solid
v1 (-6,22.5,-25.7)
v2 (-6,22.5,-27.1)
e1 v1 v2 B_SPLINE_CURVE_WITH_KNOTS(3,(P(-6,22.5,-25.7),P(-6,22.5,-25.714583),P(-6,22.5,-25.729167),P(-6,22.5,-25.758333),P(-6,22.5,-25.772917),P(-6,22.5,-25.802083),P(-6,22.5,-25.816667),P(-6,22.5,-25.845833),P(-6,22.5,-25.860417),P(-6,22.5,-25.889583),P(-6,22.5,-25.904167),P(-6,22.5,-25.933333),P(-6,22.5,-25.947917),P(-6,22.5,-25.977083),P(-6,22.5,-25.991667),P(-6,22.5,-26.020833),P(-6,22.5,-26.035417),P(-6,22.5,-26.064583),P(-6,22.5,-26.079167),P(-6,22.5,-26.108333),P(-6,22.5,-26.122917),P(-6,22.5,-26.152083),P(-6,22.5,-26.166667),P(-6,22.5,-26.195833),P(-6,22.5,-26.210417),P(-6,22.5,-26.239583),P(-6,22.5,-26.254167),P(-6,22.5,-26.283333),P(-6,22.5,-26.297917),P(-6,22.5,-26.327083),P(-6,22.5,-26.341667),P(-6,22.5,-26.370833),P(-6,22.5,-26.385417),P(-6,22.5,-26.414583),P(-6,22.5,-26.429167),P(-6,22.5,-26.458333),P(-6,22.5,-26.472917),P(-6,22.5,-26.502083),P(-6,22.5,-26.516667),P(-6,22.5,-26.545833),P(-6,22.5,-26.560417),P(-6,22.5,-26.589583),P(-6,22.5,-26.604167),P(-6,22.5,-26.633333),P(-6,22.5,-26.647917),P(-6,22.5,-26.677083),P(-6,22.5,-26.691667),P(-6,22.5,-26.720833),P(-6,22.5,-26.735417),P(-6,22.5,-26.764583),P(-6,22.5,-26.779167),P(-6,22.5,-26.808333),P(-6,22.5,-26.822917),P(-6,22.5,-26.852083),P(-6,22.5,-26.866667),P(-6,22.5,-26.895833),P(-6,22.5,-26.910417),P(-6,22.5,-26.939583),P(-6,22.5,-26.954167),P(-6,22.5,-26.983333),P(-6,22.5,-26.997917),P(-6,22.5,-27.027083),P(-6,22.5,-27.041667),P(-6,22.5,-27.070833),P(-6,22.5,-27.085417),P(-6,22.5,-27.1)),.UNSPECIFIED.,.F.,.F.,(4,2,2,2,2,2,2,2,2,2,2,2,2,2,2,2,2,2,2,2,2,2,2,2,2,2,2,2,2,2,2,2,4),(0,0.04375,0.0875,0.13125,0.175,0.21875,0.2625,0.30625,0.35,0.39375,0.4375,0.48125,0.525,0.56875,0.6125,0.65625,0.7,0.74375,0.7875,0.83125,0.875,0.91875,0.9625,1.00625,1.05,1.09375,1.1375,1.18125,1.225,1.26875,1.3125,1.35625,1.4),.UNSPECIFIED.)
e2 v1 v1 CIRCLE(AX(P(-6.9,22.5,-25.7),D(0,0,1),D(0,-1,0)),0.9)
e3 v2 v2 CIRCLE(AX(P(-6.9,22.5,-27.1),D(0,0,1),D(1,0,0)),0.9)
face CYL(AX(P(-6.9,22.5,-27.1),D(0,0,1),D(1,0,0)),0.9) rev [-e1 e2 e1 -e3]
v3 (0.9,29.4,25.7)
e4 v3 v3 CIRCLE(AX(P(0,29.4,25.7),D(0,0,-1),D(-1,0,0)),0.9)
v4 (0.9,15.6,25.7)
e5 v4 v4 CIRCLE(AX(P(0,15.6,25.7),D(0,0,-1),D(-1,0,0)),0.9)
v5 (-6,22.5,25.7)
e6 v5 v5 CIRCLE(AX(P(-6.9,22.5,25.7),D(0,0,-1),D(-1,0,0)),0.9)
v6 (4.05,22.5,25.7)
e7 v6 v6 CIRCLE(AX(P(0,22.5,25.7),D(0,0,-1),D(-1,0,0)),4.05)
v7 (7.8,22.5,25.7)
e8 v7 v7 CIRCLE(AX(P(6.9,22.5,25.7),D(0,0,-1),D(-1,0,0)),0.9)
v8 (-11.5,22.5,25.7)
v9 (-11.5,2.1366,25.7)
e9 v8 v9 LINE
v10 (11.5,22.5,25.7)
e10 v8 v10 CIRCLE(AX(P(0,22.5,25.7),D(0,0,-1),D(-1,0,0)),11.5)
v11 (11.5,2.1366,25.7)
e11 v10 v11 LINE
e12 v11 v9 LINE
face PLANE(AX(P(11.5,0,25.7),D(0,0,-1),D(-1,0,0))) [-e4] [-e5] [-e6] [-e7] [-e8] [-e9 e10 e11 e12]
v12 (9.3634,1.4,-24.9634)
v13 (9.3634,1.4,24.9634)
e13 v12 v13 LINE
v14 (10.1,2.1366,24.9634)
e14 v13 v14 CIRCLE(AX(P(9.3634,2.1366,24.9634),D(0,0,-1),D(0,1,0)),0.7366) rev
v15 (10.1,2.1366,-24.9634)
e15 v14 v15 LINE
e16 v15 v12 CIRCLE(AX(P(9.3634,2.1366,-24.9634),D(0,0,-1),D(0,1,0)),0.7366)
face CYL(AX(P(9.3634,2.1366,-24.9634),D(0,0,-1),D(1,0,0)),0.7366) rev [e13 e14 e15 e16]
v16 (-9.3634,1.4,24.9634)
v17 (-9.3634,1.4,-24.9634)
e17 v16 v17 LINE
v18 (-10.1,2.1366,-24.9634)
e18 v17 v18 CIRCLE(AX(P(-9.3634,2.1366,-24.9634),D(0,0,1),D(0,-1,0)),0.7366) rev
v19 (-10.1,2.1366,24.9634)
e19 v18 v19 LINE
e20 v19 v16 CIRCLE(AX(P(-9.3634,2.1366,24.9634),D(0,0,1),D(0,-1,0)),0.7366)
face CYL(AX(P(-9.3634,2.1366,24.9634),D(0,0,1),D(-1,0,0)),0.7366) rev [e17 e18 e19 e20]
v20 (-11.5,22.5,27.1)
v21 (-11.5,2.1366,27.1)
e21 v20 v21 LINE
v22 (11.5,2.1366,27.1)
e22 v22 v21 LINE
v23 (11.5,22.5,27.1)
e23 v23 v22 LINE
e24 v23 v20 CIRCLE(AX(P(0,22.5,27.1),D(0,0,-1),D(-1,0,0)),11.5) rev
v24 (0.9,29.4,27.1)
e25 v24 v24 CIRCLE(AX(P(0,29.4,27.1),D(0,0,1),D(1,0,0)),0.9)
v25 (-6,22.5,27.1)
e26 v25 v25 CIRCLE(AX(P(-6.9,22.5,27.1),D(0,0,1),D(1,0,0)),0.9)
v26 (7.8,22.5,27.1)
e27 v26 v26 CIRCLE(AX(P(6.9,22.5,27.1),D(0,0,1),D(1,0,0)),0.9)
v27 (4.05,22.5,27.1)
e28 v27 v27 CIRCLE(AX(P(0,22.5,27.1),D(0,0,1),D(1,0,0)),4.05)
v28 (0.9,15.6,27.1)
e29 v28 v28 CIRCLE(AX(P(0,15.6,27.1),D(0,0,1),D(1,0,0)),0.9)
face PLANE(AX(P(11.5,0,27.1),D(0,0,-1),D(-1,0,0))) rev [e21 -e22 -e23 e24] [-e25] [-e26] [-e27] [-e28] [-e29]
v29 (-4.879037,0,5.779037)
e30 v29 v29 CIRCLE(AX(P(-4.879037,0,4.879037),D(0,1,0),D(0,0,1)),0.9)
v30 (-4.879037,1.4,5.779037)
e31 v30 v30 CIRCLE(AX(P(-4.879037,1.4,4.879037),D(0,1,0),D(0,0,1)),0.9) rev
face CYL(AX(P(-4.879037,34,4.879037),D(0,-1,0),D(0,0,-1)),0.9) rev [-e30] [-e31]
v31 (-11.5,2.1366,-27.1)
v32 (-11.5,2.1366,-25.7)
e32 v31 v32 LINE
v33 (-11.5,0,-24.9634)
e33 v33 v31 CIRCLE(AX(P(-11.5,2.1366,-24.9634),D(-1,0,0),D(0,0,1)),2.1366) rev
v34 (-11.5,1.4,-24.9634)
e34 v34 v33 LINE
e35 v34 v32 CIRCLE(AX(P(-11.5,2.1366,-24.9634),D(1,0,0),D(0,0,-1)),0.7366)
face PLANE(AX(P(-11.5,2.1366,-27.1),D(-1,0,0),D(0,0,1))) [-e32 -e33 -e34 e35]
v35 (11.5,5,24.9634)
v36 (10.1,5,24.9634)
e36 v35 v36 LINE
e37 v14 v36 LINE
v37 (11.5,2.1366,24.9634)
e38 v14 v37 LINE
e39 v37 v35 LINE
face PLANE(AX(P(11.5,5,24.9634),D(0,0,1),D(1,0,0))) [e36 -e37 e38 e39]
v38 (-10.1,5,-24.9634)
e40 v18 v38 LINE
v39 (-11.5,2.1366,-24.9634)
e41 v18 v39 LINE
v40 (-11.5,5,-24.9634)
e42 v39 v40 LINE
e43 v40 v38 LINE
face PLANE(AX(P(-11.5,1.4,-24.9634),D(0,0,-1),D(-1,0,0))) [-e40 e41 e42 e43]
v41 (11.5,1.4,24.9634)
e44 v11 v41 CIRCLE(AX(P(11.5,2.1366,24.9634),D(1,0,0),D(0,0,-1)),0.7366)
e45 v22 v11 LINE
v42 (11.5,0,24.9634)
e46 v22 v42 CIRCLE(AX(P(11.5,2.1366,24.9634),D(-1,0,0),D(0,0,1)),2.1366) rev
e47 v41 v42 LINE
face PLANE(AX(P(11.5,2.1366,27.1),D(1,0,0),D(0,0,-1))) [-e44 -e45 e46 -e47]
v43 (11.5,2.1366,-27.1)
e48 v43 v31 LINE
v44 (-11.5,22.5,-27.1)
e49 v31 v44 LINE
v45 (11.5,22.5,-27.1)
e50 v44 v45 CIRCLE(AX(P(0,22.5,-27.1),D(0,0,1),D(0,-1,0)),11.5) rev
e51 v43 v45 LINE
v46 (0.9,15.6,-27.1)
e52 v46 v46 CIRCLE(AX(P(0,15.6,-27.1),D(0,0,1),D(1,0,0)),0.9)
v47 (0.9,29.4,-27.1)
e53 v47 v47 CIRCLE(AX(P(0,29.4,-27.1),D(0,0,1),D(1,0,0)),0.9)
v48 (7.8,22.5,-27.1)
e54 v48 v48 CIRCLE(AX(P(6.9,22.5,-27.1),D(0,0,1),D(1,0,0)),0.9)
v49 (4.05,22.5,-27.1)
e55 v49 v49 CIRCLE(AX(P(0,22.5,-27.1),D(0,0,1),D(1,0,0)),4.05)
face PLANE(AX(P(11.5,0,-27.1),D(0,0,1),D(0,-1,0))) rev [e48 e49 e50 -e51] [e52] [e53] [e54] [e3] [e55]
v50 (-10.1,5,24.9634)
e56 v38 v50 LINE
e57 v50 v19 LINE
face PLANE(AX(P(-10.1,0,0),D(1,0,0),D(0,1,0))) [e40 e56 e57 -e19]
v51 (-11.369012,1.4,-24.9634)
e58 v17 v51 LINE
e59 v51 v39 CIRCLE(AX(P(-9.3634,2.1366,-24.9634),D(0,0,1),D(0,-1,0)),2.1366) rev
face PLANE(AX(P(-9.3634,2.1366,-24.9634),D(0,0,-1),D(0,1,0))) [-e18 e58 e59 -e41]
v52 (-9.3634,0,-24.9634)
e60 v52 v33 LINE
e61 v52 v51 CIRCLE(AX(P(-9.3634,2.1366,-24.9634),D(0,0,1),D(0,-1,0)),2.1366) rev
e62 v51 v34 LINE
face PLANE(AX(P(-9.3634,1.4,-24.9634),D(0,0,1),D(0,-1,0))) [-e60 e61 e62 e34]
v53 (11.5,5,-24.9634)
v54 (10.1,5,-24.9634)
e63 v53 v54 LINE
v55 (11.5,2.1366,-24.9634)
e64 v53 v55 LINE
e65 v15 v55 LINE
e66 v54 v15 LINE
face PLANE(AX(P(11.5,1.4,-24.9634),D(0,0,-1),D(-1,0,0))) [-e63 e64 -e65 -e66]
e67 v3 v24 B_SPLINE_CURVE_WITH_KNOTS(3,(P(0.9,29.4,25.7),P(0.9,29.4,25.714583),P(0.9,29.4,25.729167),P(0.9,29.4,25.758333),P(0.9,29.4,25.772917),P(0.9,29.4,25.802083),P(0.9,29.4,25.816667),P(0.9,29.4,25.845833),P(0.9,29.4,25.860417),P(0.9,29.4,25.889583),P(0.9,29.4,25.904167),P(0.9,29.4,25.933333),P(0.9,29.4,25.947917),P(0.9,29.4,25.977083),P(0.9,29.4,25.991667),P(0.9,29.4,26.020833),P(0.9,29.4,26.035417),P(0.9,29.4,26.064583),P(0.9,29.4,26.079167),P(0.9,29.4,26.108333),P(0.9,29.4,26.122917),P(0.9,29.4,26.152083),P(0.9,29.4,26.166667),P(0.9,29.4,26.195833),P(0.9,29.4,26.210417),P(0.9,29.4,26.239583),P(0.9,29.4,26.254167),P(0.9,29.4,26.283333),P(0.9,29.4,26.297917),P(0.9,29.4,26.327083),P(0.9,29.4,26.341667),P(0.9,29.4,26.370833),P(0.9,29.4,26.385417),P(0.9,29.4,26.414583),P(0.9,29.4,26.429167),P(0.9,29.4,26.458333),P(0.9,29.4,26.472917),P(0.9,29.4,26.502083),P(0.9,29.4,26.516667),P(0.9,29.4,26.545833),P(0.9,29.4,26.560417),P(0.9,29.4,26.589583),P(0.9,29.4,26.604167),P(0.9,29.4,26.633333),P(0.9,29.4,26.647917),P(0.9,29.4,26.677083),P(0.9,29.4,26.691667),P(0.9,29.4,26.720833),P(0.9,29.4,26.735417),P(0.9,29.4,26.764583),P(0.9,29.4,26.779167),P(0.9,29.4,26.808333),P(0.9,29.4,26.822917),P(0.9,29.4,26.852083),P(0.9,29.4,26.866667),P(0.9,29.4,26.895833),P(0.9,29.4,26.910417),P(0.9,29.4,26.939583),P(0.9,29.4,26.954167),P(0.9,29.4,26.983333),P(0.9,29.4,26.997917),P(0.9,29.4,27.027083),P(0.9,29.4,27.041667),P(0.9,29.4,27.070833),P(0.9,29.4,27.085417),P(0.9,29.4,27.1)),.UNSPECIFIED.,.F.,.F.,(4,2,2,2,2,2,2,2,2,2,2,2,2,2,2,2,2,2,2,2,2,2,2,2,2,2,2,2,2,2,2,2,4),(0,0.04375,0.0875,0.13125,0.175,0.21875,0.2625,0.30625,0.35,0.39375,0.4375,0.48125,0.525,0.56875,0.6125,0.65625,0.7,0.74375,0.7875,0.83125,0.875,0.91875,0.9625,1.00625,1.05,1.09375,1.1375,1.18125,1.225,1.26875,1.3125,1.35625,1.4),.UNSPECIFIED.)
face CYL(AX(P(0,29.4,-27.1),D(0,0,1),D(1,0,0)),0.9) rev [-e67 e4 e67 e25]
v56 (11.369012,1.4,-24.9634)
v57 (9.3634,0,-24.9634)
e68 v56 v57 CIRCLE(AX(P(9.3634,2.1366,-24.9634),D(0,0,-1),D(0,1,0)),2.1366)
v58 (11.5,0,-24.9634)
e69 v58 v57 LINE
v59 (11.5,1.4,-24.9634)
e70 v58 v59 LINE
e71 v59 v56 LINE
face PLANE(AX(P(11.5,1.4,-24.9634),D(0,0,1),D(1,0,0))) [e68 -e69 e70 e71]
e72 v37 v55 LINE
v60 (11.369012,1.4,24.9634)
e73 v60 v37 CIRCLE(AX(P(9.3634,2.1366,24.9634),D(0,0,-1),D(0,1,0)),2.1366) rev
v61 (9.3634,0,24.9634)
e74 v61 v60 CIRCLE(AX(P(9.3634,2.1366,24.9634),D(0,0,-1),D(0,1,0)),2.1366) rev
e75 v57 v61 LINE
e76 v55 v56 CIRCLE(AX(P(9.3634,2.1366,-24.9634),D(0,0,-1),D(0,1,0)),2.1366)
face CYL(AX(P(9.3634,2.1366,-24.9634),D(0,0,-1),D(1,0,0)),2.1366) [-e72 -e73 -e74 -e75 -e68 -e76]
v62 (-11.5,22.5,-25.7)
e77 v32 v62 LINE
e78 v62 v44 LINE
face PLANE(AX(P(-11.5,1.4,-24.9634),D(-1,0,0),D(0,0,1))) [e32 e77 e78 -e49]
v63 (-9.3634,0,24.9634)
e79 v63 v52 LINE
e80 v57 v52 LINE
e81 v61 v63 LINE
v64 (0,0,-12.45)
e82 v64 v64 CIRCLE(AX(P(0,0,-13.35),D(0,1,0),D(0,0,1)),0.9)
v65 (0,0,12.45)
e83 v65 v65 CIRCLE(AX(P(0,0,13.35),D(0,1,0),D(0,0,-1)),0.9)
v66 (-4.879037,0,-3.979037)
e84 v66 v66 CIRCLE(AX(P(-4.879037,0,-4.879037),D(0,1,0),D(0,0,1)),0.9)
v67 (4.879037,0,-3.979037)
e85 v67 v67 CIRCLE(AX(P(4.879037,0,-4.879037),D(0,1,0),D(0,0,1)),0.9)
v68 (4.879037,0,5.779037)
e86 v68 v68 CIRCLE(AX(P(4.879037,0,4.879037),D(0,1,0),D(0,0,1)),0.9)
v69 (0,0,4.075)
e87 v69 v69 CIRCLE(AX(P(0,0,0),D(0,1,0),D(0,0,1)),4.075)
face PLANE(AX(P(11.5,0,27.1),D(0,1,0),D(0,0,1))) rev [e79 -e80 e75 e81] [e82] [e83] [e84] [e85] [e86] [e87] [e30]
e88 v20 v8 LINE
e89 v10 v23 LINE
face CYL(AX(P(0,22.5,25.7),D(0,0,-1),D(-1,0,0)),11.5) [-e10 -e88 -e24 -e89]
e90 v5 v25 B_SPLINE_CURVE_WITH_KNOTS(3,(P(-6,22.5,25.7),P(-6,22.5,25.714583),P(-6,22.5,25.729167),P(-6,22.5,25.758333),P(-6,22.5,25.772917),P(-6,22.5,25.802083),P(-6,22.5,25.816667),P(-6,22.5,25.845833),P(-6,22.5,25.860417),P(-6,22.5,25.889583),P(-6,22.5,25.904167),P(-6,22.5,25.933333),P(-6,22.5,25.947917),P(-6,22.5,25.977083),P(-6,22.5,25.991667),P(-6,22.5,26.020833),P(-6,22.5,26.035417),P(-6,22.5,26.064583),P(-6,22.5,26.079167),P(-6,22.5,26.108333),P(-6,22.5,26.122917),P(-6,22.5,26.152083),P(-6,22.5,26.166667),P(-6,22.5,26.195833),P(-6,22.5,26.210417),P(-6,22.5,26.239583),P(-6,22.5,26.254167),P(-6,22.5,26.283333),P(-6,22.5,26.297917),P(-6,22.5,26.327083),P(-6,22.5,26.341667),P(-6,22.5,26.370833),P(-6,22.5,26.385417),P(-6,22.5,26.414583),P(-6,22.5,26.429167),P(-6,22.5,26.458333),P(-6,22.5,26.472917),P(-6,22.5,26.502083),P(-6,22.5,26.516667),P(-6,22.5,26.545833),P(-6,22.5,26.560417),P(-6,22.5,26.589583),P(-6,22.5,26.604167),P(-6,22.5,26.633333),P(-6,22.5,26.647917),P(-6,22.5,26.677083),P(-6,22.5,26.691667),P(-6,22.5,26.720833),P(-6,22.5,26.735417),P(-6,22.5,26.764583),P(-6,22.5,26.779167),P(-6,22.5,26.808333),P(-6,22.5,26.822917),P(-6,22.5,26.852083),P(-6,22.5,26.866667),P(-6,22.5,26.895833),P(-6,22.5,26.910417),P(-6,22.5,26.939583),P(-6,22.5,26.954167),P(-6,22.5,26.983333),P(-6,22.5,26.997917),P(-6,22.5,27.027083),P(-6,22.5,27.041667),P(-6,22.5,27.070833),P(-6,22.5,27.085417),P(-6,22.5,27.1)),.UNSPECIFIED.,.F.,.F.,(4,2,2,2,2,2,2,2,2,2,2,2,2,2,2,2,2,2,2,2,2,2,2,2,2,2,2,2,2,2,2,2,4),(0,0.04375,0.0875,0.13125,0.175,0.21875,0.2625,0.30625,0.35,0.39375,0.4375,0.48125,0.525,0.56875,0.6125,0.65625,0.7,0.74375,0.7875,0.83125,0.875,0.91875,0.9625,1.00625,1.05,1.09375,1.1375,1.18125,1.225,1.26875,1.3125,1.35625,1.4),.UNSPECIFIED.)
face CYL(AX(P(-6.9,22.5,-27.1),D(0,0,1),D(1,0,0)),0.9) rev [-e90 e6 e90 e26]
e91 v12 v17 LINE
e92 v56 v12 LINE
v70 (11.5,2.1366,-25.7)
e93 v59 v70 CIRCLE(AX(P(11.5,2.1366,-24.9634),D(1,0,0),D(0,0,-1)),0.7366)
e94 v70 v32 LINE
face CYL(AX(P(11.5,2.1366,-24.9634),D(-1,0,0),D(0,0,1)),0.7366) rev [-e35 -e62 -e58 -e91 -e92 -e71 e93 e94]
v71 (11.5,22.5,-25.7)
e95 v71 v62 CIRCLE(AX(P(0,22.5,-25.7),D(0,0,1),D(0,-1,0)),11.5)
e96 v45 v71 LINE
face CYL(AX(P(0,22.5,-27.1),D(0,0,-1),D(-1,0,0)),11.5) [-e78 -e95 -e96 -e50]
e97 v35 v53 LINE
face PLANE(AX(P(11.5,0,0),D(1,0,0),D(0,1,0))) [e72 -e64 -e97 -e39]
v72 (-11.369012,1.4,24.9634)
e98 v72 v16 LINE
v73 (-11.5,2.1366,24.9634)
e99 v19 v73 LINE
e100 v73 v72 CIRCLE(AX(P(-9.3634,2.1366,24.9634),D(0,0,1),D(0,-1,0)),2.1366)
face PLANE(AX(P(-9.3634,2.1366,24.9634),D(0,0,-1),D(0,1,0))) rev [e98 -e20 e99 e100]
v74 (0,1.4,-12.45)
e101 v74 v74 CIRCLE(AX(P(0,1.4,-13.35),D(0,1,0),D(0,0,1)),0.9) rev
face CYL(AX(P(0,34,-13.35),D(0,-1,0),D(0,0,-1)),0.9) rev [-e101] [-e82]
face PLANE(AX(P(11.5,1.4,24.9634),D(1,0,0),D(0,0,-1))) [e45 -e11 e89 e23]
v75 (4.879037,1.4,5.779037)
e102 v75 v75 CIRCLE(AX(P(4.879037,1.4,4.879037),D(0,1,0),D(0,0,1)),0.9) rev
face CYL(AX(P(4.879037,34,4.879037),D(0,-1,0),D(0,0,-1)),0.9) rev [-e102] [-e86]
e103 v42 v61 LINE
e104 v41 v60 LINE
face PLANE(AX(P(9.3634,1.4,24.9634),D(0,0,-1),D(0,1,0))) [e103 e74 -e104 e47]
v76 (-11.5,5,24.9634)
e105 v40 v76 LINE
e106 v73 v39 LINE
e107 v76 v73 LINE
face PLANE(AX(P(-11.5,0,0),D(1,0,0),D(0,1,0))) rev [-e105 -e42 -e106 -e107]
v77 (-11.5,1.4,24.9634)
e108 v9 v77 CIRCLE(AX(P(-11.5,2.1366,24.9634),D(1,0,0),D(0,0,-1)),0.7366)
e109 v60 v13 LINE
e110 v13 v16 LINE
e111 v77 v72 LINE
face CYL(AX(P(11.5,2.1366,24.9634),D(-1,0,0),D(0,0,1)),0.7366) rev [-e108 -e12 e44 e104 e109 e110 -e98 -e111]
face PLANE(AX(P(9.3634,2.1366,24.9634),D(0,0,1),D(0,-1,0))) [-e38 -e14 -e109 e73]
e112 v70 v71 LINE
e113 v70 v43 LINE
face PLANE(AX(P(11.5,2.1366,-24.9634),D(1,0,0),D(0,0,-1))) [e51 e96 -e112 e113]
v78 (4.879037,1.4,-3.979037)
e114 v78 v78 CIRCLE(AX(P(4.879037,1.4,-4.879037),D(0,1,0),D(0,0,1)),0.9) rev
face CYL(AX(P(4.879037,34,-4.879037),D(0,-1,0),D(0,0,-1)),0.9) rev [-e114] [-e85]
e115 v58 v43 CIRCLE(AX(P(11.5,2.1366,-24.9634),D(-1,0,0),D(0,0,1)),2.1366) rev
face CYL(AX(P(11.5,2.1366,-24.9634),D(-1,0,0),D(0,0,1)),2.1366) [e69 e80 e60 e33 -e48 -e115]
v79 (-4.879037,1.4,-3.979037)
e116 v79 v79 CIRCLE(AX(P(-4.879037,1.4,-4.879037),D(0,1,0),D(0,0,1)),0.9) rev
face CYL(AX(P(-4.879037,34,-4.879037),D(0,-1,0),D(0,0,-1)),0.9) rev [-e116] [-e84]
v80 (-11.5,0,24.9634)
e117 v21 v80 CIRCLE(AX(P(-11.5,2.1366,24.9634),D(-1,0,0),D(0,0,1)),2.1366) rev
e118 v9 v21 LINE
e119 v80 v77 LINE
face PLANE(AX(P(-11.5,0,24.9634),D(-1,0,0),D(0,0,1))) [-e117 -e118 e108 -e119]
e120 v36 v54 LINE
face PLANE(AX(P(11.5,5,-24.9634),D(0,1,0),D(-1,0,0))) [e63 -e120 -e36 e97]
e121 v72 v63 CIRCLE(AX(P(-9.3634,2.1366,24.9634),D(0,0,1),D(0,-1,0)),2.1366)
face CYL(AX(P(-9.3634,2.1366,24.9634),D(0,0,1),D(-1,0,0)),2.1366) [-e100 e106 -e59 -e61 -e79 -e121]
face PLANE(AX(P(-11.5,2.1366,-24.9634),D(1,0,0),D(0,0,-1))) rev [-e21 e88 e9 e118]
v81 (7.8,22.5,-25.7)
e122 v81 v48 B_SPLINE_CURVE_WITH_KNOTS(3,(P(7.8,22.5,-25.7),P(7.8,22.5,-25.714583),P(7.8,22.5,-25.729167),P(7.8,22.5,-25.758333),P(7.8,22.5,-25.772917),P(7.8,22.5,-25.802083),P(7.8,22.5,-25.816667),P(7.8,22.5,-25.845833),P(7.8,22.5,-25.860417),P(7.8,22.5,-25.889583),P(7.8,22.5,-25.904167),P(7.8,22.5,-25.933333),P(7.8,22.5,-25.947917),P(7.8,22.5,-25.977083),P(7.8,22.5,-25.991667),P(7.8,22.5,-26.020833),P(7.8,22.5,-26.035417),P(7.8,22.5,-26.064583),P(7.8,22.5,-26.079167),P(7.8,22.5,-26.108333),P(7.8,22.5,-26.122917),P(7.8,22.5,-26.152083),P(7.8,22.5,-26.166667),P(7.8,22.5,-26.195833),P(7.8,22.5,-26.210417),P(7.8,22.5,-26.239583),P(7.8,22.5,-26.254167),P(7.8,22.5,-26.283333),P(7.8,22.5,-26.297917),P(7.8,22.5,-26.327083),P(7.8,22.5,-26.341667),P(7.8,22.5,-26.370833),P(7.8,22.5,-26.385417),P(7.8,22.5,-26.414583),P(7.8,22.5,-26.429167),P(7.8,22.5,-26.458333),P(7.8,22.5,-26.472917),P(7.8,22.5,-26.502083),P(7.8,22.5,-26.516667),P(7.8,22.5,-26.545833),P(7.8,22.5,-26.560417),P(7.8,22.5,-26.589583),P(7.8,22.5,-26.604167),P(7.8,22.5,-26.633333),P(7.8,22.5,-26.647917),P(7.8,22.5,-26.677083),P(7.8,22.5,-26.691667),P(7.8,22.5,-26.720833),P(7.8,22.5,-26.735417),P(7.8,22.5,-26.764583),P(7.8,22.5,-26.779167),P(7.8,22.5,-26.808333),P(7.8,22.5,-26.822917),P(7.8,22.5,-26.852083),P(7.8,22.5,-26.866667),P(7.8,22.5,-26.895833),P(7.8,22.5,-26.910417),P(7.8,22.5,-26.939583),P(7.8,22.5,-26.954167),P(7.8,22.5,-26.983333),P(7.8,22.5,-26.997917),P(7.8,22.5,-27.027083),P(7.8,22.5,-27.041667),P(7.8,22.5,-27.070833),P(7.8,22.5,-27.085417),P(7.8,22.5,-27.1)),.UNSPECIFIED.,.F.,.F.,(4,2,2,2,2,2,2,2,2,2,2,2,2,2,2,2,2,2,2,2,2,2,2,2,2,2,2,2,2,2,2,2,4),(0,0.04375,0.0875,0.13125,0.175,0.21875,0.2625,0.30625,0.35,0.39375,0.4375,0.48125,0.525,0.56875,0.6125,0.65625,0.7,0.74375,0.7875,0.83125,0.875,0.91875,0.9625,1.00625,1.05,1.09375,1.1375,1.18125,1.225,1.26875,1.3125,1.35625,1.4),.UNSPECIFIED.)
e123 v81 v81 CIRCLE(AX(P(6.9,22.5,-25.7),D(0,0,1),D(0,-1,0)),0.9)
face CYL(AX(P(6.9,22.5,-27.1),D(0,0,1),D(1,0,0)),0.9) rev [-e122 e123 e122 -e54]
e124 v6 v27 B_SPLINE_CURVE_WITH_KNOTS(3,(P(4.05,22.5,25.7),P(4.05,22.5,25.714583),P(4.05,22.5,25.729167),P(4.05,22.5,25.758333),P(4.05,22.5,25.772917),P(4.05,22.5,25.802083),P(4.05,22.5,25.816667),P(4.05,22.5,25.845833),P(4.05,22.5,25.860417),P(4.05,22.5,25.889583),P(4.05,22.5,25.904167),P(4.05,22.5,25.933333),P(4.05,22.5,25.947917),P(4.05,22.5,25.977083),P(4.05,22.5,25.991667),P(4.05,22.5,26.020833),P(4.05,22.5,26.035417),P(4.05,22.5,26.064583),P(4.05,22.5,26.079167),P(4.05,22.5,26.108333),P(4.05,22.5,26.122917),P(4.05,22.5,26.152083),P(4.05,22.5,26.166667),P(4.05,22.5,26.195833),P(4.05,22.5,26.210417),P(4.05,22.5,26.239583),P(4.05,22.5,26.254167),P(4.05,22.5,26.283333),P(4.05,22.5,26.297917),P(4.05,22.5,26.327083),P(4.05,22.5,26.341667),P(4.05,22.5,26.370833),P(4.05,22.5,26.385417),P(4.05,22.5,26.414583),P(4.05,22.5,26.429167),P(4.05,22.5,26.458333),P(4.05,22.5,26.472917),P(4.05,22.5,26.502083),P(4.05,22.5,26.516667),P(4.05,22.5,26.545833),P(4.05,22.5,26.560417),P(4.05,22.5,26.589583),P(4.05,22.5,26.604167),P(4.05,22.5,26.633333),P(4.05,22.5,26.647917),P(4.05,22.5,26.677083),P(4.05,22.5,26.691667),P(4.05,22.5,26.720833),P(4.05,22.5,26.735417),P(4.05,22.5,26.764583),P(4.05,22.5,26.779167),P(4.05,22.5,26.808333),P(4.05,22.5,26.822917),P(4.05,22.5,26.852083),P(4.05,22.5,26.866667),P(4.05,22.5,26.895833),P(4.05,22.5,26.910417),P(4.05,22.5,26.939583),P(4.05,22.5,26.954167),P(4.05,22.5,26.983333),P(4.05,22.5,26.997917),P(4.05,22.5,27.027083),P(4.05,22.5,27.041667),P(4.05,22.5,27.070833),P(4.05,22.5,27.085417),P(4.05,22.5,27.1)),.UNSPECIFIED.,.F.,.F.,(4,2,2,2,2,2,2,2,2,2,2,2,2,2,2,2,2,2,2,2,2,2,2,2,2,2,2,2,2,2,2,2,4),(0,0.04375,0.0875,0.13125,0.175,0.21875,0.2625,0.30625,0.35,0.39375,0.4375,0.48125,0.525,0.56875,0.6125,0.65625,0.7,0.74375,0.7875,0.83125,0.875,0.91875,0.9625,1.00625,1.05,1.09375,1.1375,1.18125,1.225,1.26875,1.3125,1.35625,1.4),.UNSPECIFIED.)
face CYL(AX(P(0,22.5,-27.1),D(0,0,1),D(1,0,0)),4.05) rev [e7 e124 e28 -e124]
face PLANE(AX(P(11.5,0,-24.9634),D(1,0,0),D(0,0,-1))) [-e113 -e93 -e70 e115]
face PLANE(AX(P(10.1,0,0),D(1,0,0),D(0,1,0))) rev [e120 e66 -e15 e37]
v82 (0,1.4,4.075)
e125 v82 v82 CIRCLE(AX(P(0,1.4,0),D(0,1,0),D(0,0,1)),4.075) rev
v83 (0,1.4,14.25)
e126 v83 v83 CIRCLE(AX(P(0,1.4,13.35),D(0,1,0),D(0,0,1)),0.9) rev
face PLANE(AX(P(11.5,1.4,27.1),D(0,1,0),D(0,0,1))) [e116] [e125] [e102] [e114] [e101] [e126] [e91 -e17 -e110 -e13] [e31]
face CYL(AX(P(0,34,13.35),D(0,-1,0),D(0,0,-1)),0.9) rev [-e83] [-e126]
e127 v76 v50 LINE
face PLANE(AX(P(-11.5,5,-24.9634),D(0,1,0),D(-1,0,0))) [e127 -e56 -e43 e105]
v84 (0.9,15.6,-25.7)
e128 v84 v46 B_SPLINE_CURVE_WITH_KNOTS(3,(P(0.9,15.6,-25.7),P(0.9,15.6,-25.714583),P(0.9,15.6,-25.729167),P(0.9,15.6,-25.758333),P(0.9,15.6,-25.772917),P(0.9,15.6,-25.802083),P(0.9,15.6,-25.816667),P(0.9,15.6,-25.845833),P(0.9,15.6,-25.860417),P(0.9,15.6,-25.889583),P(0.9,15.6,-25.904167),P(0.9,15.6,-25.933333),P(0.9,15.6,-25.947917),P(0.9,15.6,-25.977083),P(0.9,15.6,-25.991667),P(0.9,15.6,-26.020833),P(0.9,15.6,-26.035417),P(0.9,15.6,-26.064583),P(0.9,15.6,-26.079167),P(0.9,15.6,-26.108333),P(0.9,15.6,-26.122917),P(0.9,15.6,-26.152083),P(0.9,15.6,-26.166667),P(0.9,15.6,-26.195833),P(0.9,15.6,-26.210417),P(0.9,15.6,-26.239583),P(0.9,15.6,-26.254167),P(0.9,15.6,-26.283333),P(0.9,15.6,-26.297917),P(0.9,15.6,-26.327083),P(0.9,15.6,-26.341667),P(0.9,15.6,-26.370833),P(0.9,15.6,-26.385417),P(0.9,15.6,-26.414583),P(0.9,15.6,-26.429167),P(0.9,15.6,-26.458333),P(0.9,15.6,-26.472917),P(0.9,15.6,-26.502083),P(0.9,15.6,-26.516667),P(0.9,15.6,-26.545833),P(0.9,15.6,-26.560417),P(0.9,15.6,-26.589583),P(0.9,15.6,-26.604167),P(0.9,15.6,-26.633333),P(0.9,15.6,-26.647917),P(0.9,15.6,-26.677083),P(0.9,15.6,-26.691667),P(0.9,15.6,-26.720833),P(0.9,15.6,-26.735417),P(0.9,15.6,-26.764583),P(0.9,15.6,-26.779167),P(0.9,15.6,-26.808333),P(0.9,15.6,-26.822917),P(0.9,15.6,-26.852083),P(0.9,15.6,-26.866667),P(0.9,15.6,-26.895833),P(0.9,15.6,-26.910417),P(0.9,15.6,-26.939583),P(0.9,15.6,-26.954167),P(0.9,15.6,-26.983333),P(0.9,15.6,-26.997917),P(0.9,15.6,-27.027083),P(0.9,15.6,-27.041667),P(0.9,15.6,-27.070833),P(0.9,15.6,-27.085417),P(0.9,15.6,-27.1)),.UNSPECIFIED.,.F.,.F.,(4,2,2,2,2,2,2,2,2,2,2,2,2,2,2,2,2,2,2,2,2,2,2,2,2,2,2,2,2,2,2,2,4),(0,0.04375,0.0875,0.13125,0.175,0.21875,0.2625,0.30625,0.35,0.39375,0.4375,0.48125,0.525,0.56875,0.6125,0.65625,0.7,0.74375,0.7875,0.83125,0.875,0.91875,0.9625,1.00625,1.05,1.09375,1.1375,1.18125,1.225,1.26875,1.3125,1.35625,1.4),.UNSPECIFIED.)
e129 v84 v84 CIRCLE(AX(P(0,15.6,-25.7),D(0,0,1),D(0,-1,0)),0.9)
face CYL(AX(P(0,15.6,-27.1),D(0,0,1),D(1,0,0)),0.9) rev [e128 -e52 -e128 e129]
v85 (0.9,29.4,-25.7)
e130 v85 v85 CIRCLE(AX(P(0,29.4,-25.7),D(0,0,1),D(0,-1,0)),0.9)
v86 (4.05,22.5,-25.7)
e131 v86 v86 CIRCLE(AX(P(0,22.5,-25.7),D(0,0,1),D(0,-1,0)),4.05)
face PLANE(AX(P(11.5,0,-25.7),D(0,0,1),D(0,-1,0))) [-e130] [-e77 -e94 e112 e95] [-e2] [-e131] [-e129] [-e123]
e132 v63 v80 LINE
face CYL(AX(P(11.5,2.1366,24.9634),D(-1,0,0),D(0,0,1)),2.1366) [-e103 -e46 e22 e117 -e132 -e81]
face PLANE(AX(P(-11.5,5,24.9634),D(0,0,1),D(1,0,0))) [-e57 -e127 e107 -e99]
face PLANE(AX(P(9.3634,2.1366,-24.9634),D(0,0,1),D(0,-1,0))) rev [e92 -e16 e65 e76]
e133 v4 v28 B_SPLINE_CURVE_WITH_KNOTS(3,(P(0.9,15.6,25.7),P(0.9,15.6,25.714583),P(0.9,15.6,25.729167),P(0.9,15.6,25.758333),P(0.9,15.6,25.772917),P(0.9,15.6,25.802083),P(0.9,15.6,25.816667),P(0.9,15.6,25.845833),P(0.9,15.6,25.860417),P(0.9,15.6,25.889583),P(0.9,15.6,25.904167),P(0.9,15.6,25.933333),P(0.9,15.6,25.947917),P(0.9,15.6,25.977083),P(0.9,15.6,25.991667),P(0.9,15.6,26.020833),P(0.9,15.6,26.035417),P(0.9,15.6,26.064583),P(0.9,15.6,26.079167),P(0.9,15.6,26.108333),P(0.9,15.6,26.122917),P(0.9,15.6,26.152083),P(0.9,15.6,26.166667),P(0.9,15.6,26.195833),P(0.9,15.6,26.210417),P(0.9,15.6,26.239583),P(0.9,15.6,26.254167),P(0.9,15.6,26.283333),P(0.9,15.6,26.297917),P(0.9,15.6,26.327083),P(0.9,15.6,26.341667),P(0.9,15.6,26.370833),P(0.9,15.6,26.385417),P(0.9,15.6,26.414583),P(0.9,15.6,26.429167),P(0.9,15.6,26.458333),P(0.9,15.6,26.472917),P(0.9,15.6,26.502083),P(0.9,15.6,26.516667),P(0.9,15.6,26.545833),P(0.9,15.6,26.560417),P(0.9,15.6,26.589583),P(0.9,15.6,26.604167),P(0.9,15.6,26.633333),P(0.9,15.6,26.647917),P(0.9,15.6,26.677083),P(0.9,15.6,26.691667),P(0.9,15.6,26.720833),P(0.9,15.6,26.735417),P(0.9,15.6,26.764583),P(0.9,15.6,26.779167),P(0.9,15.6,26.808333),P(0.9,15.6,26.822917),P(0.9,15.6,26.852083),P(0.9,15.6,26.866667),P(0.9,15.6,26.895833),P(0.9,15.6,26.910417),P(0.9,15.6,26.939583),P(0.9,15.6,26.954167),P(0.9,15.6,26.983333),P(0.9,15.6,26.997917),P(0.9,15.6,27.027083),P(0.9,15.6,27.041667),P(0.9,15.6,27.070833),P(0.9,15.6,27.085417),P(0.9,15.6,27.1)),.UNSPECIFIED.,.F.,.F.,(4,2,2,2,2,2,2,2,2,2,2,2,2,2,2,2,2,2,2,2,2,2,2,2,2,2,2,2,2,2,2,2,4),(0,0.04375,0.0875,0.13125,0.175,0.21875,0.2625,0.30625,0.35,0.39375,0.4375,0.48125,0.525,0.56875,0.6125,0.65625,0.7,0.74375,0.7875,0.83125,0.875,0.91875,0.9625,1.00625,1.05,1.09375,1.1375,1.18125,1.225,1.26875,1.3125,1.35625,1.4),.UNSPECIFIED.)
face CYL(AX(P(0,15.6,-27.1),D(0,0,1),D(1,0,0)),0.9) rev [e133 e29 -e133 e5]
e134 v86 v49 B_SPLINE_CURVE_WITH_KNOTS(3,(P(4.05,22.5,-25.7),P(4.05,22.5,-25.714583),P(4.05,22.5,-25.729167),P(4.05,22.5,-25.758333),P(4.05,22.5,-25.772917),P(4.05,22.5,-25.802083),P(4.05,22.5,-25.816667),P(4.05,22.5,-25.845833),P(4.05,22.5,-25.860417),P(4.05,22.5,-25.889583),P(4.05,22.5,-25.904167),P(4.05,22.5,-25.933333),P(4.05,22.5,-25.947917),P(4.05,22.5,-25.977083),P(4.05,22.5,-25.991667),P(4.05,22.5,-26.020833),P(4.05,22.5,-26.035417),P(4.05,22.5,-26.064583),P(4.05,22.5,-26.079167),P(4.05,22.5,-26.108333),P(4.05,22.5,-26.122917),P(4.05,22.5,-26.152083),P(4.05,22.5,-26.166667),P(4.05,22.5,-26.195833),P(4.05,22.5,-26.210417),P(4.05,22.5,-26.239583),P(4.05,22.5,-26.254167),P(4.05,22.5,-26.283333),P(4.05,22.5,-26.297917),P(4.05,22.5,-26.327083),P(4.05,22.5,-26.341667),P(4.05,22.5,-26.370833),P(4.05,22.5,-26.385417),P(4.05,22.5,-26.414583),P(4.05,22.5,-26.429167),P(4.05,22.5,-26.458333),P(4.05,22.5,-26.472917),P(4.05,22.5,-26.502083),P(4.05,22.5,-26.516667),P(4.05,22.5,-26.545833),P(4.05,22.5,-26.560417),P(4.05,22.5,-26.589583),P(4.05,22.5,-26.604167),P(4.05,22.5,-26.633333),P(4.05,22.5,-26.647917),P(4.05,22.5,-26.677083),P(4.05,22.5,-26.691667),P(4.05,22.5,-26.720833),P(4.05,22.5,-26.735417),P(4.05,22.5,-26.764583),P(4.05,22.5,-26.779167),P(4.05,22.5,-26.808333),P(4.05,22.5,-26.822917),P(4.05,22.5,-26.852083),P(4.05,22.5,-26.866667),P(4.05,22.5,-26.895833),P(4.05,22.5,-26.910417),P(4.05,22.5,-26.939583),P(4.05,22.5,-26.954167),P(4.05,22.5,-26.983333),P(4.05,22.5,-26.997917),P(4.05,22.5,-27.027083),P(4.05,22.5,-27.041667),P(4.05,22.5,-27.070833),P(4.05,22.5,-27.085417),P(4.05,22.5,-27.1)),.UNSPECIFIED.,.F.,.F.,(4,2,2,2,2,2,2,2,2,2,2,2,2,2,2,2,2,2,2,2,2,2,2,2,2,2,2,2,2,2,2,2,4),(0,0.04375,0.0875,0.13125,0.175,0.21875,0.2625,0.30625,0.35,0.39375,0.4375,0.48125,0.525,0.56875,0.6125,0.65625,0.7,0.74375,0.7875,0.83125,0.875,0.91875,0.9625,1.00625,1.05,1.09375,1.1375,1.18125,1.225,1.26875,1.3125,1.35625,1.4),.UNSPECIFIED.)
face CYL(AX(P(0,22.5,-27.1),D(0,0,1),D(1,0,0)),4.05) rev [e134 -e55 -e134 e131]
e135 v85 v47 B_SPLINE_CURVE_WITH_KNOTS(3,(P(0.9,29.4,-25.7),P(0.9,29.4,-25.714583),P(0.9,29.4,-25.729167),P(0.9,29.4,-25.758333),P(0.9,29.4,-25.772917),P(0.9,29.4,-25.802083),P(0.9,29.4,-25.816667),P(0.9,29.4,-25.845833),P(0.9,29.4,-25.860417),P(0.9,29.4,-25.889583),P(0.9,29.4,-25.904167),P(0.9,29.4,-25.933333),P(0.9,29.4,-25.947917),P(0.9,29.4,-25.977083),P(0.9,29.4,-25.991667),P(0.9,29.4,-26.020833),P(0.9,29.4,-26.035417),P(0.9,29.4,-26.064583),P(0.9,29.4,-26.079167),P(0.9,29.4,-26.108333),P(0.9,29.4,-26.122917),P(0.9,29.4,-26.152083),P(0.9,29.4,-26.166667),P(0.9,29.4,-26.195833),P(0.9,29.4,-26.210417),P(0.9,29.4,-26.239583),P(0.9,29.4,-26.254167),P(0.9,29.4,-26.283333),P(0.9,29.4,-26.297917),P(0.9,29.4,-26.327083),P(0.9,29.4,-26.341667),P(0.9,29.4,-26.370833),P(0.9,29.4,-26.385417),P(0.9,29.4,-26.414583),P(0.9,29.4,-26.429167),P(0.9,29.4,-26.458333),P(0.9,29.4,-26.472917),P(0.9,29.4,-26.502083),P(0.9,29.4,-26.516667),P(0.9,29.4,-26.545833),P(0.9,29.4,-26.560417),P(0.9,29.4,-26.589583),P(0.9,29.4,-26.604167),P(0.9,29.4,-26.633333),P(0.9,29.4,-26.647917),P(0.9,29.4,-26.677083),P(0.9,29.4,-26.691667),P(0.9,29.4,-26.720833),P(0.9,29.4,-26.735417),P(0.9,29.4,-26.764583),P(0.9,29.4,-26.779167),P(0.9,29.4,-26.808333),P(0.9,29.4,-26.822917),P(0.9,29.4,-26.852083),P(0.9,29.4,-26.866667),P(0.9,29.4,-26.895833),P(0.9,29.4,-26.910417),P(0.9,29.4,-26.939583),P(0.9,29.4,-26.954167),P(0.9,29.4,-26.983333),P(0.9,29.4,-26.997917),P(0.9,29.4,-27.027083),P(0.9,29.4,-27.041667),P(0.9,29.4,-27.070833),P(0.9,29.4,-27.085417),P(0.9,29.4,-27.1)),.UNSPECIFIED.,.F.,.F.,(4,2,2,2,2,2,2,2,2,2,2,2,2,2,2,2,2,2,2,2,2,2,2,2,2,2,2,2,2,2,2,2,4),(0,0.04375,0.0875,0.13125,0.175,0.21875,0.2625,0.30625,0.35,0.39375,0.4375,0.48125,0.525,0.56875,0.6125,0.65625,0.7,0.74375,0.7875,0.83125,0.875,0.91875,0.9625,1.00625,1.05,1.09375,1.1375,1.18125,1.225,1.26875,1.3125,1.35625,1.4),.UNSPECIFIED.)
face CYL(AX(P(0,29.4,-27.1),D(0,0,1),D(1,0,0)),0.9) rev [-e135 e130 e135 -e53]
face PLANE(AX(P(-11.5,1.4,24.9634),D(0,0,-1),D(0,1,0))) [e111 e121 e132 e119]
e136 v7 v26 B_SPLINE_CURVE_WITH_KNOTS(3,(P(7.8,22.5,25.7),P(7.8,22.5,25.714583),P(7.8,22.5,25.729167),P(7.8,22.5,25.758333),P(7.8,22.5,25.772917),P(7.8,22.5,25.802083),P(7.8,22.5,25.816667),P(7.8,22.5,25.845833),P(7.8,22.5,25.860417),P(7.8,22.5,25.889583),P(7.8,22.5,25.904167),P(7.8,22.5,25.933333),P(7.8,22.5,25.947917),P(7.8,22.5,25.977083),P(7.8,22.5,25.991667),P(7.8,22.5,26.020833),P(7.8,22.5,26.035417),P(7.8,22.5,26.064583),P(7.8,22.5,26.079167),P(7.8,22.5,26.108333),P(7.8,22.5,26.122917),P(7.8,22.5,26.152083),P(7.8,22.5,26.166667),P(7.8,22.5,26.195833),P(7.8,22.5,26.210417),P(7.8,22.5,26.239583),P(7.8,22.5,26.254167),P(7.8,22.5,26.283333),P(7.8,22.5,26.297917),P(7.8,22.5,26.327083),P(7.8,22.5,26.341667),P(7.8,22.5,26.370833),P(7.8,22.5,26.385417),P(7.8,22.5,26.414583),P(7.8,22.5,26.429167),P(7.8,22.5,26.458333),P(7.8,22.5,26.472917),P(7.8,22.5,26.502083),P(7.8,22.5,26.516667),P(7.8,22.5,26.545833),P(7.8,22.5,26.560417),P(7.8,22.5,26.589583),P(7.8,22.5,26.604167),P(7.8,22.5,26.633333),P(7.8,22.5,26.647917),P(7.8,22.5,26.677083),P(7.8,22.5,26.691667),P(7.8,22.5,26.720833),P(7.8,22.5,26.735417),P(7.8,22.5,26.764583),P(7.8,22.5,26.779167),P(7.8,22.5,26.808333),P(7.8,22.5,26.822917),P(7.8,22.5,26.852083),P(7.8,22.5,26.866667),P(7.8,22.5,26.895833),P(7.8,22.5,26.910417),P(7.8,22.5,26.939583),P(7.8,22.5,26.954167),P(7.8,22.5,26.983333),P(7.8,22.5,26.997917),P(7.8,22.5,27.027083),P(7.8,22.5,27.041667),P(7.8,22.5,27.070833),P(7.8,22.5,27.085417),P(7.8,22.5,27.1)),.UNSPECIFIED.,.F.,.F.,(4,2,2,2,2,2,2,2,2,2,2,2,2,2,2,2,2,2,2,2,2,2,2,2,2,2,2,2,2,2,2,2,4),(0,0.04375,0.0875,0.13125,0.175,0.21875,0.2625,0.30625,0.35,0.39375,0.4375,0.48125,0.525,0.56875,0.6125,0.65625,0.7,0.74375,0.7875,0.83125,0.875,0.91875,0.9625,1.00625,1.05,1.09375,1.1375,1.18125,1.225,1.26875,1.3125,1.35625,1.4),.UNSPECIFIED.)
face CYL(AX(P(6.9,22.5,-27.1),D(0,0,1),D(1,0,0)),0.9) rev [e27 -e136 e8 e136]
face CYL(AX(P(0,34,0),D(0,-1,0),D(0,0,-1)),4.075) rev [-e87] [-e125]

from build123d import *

# Parameters (mm, degrees)
BASE_FLANGE1_START             = -11.5
BASE_FLANGE1_DEPTH             = 23
EDGE_FLANGE1_STRIP_W           = 7.0732
EDGE_FLANGE1_STRIP_H           = 1.4
EDGE_FLANGE1_STRIP_CUT_DEPTH   = 49.9268
EDGE_FLANGE1_STRIP_2_W         = 7.0732
EDGE_FLANGE1_STRIP_2_H         = 1.4
EDGE_FLANGE1_STRIP_CUT_2_DEPTH = 49.9268
EDGE_FLANGE1_DEPTH             = 49.9268
EDGE_FLANGE1_BEND_DEPTH        = 49.9268
FILLET1_RADIUS                 = 11.5
FILLET1_LENGTH                 = 1.4
FILLET2_RADIUS                 = 11.5
FILLET2_LENGTH                 = 1.4
SKETCH12_R                     = 4.05
SKETCH12_R_2                   = 0.9
CUT_EXTRUDE1_DEPTH             = 66.006845793
SKETCH13_R                     = 4.075
SKETCH13_R_2                   = 0.9
CUT_EXTRUDE2_DEPTH             = 45.973992485


# Read off the part's stored shape, not the designer's step: Base-Flange1
# Sheet-metal steps are written as plain solids
with BuildPart() as part:
    # Base-Flange1 outline → Base-Flange1 (new body)
    with BuildSketch(Plane(origin=(0, 0, 0), x_dir=(0, 0, -1), z_dir=(1, 0, 0)).offset(BASE_FLANGE1_START)):
        with BuildLine():
            Line((27.1, 2.1366), (27.1, 34))
            Line((27.1, 34), (25.7, 34))
            Line((25.7, 34), (25.7, 2.1366))
            ThreePointArc((25.7, 2.1366), (25.484254855, 1.615745145), (24.9634, 1.4))
            Line((24.9634, 1.4), (-24.9634, 1.4))
            ThreePointArc((-24.9634, 1.4), (-25.484254855, 1.615745145), (-25.7, 2.1366))
            Line((-25.7, 2.1366), (-25.7, 34))
            Line((-25.7, 34), (-27.1, 34))
            Line((-27.1, 34), (-27.1, 2.1366))
            ThreePointArc((-27.1, 2.1366), (-26.474204349, 0.625795651), (-24.9634, 0))
            Line((-24.9634, 0), (24.9634, 0))
            ThreePointArc((24.9634, 0), (26.474204349, 0.625795651), (27.1, 2.1366))
        make_face()
    extrude(amount=BASE_FLANGE1_DEPTH)

    # Edge-Flange1 strip (across the edge) → Edge-Flange1 strip cut (cut)
    with BuildSketch(Plane(origin=(11.5, 1.4, 24.9634), x_dir=(-1, 0, 0), z_dir=(0, 0, -1))):
        with Locations((-1.4, -0.7)):
            Rectangle(EDGE_FLANGE1_STRIP_W, EDGE_FLANGE1_STRIP_H)
    extrude(amount=EDGE_FLANGE1_STRIP_CUT_DEPTH, mode=Mode.SUBTRACT)

    # Edge-Flange1 strip 2 (across the edge) → Edge-Flange1 strip cut 2 (cut)
    with BuildSketch(Plane(origin=(-11.5, 1.4, -24.9634), x_dir=(1, 0, 0), z_dir=(0, 0, 1))):
        with Locations((-1.4, -0.7)):
            Rectangle(EDGE_FLANGE1_STRIP_2_W, EDGE_FLANGE1_STRIP_2_H)
    extrude(amount=EDGE_FLANGE1_STRIP_CUT_2_DEPTH, mode=Mode.SUBTRACT)

    # Edge-Flange1 section (across the edge) → Edge-Flange1 (add)
    with BuildSketch(Plane(origin=(11.5, 1.4, 24.9634), x_dir=(-1, 0, 0), z_dir=(0, 0, -1))):
        with BuildLine():
            Line((0, 0.7366), (0, 3.6))
            Line((0, 3.6), (1.4, 3.6))
            Line((1.4, 3.6), (1.4, 0.7366))
            ThreePointArc((1.4, 0.7366), (1.615745145, 0.215745145), (2.1366, 0))
            Line((2.1366, 0), (2.1366, -1.4))
            ThreePointArc((2.1366, -1.4), (0.625795651, -0.774204349), (0, 0.7366))
        make_face()
    extrude(amount=EDGE_FLANGE1_DEPTH)

    # Edge-Flange1 section 2 (across the edge) → Edge-Flange1 bend (add)
    with BuildSketch(Plane(origin=(-11.5, 1.4, -24.9634), x_dir=(1, 0, 0), z_dir=(0, 0, 1))):
        with BuildLine():
            Line((0, 0.7366), (0, 3.6))
            Line((0, 3.6), (1.4, 3.6))
            Line((1.4, 3.6), (1.4, 0.7366))
            ThreePointArc((1.4, 0.7366), (1.615745145, 0.215745145), (2.1366, 0))
            Line((2.1366, 0), (2.1366, -1.4))
            ThreePointArc((2.1366, -1.4), (0.625795651, -0.774204349), (0, 0.7366))
        make_face()
    extrude(amount=EDGE_FLANGE1_BEND_DEPTH)

    # Fillet1: full round fillet: the end face becomes a half cylinder, R = half its width
    fillet1_face = Plane((0, 34, 26.4), x_dir=(0, 0, 1), z_dir=(0, 1, 0))  # on the end face: x along it, z out of the body
    fillet1_slab = fillet1_face.offset(-FILLET1_RADIUS / 2) * Box(FILLET1_LENGTH, 2 * FILLET1_RADIUS, FILLET1_RADIUS, mode=Mode.PRIVATE)  # the body's end, R deep
    fillet1_round = Plane((0, 22.5, 26.4), x_dir=(0, 1, 0), z_dir=(0, 0, 1)) * Cylinder(FILLET1_RADIUS, FILLET1_LENGTH, mode=Mode.PRIVATE)  # its axis R under the face
    add(fillet1_slab - fillet1_round, mode=Mode.SUBTRACT)

    # Fillet2: full round fillet: the end face becomes a half cylinder, R = half its width
    fillet2_face = Plane((0, 34, -26.4), x_dir=(0, 0, 1), z_dir=(0, 1, 0))  # on the end face: x along it, z out of the body
    fillet2_slab = fillet2_face.offset(-FILLET2_RADIUS / 2) * Box(FILLET2_LENGTH, 2 * FILLET2_RADIUS, FILLET2_RADIUS, mode=Mode.PRIVATE)  # the body's end, R deep
    fillet2_round = Plane((0, 22.5, -26.4), x_dir=(0, 1, 0), z_dir=(0, 0, 1)) * Cylinder(FILLET2_RADIUS, FILLET2_LENGTH, mode=Mode.PRIVATE)  # its axis R under the face
    add(fillet2_slab - fillet2_round, mode=Mode.SUBTRACT)

    # Sketch12 → Cut-Extrude1 (cut, through all)
    with BuildSketch(Plane.XY.offset(27.1)):
        with Locations((0, 22.5)):
            Circle(SKETCH12_R)
        with Locations((0, 29.4)):
            Circle(SKETCH12_R_2)
        with Locations((6.9, 22.5)):
            Circle(SKETCH12_R_2)
        with Locations((0, 15.6)):
            Circle(SKETCH12_R_2)
        with Locations((-6.9, 22.5)):
            Circle(SKETCH12_R_2)
    extrude(amount=-CUT_EXTRUDE1_DEPTH, mode=Mode.SUBTRACT)

    # Sketch13 → Cut-Extrude2 (cut, through all)
    with BuildSketch(Plane(origin=(0, 0, 0), x_dir=(1, 0, 0), z_dir=(0, 1, 0))):
        with Locations(Location((0, 0, 0), (0, 0, 270))):
            Circle(SKETCH13_R)
        with Locations(Location((-4.87903679, 4.87903679, 0), (0, 0, 270))):
            Circle(SKETCH13_R_2)
        with Locations(Location((4.87903679, 4.87903679, 0), (0, 0, 270))):
            Circle(SKETCH13_R_2)
        with Locations(Location((4.87903679, -4.87903679, 0), (0, 0, 270))):
            Circle(SKETCH13_R_2)
        with Locations(Location((-4.87903679, -4.87903679, 0), (0, 0, 270))):
            Circle(SKETCH13_R_2)
        with Locations(Location((0, 13.35, 0), (0, 0, 270))):
            Circle(SKETCH13_R_2)
        with Locations(Location((0, -13.35, 0), (0, 0, 90))):
            Circle(SKETCH13_R_2)
    extrude(amount=CUT_EXTRUDE2_DEPTH, mode=Mode.SUBTRACT)


solid = part.part
